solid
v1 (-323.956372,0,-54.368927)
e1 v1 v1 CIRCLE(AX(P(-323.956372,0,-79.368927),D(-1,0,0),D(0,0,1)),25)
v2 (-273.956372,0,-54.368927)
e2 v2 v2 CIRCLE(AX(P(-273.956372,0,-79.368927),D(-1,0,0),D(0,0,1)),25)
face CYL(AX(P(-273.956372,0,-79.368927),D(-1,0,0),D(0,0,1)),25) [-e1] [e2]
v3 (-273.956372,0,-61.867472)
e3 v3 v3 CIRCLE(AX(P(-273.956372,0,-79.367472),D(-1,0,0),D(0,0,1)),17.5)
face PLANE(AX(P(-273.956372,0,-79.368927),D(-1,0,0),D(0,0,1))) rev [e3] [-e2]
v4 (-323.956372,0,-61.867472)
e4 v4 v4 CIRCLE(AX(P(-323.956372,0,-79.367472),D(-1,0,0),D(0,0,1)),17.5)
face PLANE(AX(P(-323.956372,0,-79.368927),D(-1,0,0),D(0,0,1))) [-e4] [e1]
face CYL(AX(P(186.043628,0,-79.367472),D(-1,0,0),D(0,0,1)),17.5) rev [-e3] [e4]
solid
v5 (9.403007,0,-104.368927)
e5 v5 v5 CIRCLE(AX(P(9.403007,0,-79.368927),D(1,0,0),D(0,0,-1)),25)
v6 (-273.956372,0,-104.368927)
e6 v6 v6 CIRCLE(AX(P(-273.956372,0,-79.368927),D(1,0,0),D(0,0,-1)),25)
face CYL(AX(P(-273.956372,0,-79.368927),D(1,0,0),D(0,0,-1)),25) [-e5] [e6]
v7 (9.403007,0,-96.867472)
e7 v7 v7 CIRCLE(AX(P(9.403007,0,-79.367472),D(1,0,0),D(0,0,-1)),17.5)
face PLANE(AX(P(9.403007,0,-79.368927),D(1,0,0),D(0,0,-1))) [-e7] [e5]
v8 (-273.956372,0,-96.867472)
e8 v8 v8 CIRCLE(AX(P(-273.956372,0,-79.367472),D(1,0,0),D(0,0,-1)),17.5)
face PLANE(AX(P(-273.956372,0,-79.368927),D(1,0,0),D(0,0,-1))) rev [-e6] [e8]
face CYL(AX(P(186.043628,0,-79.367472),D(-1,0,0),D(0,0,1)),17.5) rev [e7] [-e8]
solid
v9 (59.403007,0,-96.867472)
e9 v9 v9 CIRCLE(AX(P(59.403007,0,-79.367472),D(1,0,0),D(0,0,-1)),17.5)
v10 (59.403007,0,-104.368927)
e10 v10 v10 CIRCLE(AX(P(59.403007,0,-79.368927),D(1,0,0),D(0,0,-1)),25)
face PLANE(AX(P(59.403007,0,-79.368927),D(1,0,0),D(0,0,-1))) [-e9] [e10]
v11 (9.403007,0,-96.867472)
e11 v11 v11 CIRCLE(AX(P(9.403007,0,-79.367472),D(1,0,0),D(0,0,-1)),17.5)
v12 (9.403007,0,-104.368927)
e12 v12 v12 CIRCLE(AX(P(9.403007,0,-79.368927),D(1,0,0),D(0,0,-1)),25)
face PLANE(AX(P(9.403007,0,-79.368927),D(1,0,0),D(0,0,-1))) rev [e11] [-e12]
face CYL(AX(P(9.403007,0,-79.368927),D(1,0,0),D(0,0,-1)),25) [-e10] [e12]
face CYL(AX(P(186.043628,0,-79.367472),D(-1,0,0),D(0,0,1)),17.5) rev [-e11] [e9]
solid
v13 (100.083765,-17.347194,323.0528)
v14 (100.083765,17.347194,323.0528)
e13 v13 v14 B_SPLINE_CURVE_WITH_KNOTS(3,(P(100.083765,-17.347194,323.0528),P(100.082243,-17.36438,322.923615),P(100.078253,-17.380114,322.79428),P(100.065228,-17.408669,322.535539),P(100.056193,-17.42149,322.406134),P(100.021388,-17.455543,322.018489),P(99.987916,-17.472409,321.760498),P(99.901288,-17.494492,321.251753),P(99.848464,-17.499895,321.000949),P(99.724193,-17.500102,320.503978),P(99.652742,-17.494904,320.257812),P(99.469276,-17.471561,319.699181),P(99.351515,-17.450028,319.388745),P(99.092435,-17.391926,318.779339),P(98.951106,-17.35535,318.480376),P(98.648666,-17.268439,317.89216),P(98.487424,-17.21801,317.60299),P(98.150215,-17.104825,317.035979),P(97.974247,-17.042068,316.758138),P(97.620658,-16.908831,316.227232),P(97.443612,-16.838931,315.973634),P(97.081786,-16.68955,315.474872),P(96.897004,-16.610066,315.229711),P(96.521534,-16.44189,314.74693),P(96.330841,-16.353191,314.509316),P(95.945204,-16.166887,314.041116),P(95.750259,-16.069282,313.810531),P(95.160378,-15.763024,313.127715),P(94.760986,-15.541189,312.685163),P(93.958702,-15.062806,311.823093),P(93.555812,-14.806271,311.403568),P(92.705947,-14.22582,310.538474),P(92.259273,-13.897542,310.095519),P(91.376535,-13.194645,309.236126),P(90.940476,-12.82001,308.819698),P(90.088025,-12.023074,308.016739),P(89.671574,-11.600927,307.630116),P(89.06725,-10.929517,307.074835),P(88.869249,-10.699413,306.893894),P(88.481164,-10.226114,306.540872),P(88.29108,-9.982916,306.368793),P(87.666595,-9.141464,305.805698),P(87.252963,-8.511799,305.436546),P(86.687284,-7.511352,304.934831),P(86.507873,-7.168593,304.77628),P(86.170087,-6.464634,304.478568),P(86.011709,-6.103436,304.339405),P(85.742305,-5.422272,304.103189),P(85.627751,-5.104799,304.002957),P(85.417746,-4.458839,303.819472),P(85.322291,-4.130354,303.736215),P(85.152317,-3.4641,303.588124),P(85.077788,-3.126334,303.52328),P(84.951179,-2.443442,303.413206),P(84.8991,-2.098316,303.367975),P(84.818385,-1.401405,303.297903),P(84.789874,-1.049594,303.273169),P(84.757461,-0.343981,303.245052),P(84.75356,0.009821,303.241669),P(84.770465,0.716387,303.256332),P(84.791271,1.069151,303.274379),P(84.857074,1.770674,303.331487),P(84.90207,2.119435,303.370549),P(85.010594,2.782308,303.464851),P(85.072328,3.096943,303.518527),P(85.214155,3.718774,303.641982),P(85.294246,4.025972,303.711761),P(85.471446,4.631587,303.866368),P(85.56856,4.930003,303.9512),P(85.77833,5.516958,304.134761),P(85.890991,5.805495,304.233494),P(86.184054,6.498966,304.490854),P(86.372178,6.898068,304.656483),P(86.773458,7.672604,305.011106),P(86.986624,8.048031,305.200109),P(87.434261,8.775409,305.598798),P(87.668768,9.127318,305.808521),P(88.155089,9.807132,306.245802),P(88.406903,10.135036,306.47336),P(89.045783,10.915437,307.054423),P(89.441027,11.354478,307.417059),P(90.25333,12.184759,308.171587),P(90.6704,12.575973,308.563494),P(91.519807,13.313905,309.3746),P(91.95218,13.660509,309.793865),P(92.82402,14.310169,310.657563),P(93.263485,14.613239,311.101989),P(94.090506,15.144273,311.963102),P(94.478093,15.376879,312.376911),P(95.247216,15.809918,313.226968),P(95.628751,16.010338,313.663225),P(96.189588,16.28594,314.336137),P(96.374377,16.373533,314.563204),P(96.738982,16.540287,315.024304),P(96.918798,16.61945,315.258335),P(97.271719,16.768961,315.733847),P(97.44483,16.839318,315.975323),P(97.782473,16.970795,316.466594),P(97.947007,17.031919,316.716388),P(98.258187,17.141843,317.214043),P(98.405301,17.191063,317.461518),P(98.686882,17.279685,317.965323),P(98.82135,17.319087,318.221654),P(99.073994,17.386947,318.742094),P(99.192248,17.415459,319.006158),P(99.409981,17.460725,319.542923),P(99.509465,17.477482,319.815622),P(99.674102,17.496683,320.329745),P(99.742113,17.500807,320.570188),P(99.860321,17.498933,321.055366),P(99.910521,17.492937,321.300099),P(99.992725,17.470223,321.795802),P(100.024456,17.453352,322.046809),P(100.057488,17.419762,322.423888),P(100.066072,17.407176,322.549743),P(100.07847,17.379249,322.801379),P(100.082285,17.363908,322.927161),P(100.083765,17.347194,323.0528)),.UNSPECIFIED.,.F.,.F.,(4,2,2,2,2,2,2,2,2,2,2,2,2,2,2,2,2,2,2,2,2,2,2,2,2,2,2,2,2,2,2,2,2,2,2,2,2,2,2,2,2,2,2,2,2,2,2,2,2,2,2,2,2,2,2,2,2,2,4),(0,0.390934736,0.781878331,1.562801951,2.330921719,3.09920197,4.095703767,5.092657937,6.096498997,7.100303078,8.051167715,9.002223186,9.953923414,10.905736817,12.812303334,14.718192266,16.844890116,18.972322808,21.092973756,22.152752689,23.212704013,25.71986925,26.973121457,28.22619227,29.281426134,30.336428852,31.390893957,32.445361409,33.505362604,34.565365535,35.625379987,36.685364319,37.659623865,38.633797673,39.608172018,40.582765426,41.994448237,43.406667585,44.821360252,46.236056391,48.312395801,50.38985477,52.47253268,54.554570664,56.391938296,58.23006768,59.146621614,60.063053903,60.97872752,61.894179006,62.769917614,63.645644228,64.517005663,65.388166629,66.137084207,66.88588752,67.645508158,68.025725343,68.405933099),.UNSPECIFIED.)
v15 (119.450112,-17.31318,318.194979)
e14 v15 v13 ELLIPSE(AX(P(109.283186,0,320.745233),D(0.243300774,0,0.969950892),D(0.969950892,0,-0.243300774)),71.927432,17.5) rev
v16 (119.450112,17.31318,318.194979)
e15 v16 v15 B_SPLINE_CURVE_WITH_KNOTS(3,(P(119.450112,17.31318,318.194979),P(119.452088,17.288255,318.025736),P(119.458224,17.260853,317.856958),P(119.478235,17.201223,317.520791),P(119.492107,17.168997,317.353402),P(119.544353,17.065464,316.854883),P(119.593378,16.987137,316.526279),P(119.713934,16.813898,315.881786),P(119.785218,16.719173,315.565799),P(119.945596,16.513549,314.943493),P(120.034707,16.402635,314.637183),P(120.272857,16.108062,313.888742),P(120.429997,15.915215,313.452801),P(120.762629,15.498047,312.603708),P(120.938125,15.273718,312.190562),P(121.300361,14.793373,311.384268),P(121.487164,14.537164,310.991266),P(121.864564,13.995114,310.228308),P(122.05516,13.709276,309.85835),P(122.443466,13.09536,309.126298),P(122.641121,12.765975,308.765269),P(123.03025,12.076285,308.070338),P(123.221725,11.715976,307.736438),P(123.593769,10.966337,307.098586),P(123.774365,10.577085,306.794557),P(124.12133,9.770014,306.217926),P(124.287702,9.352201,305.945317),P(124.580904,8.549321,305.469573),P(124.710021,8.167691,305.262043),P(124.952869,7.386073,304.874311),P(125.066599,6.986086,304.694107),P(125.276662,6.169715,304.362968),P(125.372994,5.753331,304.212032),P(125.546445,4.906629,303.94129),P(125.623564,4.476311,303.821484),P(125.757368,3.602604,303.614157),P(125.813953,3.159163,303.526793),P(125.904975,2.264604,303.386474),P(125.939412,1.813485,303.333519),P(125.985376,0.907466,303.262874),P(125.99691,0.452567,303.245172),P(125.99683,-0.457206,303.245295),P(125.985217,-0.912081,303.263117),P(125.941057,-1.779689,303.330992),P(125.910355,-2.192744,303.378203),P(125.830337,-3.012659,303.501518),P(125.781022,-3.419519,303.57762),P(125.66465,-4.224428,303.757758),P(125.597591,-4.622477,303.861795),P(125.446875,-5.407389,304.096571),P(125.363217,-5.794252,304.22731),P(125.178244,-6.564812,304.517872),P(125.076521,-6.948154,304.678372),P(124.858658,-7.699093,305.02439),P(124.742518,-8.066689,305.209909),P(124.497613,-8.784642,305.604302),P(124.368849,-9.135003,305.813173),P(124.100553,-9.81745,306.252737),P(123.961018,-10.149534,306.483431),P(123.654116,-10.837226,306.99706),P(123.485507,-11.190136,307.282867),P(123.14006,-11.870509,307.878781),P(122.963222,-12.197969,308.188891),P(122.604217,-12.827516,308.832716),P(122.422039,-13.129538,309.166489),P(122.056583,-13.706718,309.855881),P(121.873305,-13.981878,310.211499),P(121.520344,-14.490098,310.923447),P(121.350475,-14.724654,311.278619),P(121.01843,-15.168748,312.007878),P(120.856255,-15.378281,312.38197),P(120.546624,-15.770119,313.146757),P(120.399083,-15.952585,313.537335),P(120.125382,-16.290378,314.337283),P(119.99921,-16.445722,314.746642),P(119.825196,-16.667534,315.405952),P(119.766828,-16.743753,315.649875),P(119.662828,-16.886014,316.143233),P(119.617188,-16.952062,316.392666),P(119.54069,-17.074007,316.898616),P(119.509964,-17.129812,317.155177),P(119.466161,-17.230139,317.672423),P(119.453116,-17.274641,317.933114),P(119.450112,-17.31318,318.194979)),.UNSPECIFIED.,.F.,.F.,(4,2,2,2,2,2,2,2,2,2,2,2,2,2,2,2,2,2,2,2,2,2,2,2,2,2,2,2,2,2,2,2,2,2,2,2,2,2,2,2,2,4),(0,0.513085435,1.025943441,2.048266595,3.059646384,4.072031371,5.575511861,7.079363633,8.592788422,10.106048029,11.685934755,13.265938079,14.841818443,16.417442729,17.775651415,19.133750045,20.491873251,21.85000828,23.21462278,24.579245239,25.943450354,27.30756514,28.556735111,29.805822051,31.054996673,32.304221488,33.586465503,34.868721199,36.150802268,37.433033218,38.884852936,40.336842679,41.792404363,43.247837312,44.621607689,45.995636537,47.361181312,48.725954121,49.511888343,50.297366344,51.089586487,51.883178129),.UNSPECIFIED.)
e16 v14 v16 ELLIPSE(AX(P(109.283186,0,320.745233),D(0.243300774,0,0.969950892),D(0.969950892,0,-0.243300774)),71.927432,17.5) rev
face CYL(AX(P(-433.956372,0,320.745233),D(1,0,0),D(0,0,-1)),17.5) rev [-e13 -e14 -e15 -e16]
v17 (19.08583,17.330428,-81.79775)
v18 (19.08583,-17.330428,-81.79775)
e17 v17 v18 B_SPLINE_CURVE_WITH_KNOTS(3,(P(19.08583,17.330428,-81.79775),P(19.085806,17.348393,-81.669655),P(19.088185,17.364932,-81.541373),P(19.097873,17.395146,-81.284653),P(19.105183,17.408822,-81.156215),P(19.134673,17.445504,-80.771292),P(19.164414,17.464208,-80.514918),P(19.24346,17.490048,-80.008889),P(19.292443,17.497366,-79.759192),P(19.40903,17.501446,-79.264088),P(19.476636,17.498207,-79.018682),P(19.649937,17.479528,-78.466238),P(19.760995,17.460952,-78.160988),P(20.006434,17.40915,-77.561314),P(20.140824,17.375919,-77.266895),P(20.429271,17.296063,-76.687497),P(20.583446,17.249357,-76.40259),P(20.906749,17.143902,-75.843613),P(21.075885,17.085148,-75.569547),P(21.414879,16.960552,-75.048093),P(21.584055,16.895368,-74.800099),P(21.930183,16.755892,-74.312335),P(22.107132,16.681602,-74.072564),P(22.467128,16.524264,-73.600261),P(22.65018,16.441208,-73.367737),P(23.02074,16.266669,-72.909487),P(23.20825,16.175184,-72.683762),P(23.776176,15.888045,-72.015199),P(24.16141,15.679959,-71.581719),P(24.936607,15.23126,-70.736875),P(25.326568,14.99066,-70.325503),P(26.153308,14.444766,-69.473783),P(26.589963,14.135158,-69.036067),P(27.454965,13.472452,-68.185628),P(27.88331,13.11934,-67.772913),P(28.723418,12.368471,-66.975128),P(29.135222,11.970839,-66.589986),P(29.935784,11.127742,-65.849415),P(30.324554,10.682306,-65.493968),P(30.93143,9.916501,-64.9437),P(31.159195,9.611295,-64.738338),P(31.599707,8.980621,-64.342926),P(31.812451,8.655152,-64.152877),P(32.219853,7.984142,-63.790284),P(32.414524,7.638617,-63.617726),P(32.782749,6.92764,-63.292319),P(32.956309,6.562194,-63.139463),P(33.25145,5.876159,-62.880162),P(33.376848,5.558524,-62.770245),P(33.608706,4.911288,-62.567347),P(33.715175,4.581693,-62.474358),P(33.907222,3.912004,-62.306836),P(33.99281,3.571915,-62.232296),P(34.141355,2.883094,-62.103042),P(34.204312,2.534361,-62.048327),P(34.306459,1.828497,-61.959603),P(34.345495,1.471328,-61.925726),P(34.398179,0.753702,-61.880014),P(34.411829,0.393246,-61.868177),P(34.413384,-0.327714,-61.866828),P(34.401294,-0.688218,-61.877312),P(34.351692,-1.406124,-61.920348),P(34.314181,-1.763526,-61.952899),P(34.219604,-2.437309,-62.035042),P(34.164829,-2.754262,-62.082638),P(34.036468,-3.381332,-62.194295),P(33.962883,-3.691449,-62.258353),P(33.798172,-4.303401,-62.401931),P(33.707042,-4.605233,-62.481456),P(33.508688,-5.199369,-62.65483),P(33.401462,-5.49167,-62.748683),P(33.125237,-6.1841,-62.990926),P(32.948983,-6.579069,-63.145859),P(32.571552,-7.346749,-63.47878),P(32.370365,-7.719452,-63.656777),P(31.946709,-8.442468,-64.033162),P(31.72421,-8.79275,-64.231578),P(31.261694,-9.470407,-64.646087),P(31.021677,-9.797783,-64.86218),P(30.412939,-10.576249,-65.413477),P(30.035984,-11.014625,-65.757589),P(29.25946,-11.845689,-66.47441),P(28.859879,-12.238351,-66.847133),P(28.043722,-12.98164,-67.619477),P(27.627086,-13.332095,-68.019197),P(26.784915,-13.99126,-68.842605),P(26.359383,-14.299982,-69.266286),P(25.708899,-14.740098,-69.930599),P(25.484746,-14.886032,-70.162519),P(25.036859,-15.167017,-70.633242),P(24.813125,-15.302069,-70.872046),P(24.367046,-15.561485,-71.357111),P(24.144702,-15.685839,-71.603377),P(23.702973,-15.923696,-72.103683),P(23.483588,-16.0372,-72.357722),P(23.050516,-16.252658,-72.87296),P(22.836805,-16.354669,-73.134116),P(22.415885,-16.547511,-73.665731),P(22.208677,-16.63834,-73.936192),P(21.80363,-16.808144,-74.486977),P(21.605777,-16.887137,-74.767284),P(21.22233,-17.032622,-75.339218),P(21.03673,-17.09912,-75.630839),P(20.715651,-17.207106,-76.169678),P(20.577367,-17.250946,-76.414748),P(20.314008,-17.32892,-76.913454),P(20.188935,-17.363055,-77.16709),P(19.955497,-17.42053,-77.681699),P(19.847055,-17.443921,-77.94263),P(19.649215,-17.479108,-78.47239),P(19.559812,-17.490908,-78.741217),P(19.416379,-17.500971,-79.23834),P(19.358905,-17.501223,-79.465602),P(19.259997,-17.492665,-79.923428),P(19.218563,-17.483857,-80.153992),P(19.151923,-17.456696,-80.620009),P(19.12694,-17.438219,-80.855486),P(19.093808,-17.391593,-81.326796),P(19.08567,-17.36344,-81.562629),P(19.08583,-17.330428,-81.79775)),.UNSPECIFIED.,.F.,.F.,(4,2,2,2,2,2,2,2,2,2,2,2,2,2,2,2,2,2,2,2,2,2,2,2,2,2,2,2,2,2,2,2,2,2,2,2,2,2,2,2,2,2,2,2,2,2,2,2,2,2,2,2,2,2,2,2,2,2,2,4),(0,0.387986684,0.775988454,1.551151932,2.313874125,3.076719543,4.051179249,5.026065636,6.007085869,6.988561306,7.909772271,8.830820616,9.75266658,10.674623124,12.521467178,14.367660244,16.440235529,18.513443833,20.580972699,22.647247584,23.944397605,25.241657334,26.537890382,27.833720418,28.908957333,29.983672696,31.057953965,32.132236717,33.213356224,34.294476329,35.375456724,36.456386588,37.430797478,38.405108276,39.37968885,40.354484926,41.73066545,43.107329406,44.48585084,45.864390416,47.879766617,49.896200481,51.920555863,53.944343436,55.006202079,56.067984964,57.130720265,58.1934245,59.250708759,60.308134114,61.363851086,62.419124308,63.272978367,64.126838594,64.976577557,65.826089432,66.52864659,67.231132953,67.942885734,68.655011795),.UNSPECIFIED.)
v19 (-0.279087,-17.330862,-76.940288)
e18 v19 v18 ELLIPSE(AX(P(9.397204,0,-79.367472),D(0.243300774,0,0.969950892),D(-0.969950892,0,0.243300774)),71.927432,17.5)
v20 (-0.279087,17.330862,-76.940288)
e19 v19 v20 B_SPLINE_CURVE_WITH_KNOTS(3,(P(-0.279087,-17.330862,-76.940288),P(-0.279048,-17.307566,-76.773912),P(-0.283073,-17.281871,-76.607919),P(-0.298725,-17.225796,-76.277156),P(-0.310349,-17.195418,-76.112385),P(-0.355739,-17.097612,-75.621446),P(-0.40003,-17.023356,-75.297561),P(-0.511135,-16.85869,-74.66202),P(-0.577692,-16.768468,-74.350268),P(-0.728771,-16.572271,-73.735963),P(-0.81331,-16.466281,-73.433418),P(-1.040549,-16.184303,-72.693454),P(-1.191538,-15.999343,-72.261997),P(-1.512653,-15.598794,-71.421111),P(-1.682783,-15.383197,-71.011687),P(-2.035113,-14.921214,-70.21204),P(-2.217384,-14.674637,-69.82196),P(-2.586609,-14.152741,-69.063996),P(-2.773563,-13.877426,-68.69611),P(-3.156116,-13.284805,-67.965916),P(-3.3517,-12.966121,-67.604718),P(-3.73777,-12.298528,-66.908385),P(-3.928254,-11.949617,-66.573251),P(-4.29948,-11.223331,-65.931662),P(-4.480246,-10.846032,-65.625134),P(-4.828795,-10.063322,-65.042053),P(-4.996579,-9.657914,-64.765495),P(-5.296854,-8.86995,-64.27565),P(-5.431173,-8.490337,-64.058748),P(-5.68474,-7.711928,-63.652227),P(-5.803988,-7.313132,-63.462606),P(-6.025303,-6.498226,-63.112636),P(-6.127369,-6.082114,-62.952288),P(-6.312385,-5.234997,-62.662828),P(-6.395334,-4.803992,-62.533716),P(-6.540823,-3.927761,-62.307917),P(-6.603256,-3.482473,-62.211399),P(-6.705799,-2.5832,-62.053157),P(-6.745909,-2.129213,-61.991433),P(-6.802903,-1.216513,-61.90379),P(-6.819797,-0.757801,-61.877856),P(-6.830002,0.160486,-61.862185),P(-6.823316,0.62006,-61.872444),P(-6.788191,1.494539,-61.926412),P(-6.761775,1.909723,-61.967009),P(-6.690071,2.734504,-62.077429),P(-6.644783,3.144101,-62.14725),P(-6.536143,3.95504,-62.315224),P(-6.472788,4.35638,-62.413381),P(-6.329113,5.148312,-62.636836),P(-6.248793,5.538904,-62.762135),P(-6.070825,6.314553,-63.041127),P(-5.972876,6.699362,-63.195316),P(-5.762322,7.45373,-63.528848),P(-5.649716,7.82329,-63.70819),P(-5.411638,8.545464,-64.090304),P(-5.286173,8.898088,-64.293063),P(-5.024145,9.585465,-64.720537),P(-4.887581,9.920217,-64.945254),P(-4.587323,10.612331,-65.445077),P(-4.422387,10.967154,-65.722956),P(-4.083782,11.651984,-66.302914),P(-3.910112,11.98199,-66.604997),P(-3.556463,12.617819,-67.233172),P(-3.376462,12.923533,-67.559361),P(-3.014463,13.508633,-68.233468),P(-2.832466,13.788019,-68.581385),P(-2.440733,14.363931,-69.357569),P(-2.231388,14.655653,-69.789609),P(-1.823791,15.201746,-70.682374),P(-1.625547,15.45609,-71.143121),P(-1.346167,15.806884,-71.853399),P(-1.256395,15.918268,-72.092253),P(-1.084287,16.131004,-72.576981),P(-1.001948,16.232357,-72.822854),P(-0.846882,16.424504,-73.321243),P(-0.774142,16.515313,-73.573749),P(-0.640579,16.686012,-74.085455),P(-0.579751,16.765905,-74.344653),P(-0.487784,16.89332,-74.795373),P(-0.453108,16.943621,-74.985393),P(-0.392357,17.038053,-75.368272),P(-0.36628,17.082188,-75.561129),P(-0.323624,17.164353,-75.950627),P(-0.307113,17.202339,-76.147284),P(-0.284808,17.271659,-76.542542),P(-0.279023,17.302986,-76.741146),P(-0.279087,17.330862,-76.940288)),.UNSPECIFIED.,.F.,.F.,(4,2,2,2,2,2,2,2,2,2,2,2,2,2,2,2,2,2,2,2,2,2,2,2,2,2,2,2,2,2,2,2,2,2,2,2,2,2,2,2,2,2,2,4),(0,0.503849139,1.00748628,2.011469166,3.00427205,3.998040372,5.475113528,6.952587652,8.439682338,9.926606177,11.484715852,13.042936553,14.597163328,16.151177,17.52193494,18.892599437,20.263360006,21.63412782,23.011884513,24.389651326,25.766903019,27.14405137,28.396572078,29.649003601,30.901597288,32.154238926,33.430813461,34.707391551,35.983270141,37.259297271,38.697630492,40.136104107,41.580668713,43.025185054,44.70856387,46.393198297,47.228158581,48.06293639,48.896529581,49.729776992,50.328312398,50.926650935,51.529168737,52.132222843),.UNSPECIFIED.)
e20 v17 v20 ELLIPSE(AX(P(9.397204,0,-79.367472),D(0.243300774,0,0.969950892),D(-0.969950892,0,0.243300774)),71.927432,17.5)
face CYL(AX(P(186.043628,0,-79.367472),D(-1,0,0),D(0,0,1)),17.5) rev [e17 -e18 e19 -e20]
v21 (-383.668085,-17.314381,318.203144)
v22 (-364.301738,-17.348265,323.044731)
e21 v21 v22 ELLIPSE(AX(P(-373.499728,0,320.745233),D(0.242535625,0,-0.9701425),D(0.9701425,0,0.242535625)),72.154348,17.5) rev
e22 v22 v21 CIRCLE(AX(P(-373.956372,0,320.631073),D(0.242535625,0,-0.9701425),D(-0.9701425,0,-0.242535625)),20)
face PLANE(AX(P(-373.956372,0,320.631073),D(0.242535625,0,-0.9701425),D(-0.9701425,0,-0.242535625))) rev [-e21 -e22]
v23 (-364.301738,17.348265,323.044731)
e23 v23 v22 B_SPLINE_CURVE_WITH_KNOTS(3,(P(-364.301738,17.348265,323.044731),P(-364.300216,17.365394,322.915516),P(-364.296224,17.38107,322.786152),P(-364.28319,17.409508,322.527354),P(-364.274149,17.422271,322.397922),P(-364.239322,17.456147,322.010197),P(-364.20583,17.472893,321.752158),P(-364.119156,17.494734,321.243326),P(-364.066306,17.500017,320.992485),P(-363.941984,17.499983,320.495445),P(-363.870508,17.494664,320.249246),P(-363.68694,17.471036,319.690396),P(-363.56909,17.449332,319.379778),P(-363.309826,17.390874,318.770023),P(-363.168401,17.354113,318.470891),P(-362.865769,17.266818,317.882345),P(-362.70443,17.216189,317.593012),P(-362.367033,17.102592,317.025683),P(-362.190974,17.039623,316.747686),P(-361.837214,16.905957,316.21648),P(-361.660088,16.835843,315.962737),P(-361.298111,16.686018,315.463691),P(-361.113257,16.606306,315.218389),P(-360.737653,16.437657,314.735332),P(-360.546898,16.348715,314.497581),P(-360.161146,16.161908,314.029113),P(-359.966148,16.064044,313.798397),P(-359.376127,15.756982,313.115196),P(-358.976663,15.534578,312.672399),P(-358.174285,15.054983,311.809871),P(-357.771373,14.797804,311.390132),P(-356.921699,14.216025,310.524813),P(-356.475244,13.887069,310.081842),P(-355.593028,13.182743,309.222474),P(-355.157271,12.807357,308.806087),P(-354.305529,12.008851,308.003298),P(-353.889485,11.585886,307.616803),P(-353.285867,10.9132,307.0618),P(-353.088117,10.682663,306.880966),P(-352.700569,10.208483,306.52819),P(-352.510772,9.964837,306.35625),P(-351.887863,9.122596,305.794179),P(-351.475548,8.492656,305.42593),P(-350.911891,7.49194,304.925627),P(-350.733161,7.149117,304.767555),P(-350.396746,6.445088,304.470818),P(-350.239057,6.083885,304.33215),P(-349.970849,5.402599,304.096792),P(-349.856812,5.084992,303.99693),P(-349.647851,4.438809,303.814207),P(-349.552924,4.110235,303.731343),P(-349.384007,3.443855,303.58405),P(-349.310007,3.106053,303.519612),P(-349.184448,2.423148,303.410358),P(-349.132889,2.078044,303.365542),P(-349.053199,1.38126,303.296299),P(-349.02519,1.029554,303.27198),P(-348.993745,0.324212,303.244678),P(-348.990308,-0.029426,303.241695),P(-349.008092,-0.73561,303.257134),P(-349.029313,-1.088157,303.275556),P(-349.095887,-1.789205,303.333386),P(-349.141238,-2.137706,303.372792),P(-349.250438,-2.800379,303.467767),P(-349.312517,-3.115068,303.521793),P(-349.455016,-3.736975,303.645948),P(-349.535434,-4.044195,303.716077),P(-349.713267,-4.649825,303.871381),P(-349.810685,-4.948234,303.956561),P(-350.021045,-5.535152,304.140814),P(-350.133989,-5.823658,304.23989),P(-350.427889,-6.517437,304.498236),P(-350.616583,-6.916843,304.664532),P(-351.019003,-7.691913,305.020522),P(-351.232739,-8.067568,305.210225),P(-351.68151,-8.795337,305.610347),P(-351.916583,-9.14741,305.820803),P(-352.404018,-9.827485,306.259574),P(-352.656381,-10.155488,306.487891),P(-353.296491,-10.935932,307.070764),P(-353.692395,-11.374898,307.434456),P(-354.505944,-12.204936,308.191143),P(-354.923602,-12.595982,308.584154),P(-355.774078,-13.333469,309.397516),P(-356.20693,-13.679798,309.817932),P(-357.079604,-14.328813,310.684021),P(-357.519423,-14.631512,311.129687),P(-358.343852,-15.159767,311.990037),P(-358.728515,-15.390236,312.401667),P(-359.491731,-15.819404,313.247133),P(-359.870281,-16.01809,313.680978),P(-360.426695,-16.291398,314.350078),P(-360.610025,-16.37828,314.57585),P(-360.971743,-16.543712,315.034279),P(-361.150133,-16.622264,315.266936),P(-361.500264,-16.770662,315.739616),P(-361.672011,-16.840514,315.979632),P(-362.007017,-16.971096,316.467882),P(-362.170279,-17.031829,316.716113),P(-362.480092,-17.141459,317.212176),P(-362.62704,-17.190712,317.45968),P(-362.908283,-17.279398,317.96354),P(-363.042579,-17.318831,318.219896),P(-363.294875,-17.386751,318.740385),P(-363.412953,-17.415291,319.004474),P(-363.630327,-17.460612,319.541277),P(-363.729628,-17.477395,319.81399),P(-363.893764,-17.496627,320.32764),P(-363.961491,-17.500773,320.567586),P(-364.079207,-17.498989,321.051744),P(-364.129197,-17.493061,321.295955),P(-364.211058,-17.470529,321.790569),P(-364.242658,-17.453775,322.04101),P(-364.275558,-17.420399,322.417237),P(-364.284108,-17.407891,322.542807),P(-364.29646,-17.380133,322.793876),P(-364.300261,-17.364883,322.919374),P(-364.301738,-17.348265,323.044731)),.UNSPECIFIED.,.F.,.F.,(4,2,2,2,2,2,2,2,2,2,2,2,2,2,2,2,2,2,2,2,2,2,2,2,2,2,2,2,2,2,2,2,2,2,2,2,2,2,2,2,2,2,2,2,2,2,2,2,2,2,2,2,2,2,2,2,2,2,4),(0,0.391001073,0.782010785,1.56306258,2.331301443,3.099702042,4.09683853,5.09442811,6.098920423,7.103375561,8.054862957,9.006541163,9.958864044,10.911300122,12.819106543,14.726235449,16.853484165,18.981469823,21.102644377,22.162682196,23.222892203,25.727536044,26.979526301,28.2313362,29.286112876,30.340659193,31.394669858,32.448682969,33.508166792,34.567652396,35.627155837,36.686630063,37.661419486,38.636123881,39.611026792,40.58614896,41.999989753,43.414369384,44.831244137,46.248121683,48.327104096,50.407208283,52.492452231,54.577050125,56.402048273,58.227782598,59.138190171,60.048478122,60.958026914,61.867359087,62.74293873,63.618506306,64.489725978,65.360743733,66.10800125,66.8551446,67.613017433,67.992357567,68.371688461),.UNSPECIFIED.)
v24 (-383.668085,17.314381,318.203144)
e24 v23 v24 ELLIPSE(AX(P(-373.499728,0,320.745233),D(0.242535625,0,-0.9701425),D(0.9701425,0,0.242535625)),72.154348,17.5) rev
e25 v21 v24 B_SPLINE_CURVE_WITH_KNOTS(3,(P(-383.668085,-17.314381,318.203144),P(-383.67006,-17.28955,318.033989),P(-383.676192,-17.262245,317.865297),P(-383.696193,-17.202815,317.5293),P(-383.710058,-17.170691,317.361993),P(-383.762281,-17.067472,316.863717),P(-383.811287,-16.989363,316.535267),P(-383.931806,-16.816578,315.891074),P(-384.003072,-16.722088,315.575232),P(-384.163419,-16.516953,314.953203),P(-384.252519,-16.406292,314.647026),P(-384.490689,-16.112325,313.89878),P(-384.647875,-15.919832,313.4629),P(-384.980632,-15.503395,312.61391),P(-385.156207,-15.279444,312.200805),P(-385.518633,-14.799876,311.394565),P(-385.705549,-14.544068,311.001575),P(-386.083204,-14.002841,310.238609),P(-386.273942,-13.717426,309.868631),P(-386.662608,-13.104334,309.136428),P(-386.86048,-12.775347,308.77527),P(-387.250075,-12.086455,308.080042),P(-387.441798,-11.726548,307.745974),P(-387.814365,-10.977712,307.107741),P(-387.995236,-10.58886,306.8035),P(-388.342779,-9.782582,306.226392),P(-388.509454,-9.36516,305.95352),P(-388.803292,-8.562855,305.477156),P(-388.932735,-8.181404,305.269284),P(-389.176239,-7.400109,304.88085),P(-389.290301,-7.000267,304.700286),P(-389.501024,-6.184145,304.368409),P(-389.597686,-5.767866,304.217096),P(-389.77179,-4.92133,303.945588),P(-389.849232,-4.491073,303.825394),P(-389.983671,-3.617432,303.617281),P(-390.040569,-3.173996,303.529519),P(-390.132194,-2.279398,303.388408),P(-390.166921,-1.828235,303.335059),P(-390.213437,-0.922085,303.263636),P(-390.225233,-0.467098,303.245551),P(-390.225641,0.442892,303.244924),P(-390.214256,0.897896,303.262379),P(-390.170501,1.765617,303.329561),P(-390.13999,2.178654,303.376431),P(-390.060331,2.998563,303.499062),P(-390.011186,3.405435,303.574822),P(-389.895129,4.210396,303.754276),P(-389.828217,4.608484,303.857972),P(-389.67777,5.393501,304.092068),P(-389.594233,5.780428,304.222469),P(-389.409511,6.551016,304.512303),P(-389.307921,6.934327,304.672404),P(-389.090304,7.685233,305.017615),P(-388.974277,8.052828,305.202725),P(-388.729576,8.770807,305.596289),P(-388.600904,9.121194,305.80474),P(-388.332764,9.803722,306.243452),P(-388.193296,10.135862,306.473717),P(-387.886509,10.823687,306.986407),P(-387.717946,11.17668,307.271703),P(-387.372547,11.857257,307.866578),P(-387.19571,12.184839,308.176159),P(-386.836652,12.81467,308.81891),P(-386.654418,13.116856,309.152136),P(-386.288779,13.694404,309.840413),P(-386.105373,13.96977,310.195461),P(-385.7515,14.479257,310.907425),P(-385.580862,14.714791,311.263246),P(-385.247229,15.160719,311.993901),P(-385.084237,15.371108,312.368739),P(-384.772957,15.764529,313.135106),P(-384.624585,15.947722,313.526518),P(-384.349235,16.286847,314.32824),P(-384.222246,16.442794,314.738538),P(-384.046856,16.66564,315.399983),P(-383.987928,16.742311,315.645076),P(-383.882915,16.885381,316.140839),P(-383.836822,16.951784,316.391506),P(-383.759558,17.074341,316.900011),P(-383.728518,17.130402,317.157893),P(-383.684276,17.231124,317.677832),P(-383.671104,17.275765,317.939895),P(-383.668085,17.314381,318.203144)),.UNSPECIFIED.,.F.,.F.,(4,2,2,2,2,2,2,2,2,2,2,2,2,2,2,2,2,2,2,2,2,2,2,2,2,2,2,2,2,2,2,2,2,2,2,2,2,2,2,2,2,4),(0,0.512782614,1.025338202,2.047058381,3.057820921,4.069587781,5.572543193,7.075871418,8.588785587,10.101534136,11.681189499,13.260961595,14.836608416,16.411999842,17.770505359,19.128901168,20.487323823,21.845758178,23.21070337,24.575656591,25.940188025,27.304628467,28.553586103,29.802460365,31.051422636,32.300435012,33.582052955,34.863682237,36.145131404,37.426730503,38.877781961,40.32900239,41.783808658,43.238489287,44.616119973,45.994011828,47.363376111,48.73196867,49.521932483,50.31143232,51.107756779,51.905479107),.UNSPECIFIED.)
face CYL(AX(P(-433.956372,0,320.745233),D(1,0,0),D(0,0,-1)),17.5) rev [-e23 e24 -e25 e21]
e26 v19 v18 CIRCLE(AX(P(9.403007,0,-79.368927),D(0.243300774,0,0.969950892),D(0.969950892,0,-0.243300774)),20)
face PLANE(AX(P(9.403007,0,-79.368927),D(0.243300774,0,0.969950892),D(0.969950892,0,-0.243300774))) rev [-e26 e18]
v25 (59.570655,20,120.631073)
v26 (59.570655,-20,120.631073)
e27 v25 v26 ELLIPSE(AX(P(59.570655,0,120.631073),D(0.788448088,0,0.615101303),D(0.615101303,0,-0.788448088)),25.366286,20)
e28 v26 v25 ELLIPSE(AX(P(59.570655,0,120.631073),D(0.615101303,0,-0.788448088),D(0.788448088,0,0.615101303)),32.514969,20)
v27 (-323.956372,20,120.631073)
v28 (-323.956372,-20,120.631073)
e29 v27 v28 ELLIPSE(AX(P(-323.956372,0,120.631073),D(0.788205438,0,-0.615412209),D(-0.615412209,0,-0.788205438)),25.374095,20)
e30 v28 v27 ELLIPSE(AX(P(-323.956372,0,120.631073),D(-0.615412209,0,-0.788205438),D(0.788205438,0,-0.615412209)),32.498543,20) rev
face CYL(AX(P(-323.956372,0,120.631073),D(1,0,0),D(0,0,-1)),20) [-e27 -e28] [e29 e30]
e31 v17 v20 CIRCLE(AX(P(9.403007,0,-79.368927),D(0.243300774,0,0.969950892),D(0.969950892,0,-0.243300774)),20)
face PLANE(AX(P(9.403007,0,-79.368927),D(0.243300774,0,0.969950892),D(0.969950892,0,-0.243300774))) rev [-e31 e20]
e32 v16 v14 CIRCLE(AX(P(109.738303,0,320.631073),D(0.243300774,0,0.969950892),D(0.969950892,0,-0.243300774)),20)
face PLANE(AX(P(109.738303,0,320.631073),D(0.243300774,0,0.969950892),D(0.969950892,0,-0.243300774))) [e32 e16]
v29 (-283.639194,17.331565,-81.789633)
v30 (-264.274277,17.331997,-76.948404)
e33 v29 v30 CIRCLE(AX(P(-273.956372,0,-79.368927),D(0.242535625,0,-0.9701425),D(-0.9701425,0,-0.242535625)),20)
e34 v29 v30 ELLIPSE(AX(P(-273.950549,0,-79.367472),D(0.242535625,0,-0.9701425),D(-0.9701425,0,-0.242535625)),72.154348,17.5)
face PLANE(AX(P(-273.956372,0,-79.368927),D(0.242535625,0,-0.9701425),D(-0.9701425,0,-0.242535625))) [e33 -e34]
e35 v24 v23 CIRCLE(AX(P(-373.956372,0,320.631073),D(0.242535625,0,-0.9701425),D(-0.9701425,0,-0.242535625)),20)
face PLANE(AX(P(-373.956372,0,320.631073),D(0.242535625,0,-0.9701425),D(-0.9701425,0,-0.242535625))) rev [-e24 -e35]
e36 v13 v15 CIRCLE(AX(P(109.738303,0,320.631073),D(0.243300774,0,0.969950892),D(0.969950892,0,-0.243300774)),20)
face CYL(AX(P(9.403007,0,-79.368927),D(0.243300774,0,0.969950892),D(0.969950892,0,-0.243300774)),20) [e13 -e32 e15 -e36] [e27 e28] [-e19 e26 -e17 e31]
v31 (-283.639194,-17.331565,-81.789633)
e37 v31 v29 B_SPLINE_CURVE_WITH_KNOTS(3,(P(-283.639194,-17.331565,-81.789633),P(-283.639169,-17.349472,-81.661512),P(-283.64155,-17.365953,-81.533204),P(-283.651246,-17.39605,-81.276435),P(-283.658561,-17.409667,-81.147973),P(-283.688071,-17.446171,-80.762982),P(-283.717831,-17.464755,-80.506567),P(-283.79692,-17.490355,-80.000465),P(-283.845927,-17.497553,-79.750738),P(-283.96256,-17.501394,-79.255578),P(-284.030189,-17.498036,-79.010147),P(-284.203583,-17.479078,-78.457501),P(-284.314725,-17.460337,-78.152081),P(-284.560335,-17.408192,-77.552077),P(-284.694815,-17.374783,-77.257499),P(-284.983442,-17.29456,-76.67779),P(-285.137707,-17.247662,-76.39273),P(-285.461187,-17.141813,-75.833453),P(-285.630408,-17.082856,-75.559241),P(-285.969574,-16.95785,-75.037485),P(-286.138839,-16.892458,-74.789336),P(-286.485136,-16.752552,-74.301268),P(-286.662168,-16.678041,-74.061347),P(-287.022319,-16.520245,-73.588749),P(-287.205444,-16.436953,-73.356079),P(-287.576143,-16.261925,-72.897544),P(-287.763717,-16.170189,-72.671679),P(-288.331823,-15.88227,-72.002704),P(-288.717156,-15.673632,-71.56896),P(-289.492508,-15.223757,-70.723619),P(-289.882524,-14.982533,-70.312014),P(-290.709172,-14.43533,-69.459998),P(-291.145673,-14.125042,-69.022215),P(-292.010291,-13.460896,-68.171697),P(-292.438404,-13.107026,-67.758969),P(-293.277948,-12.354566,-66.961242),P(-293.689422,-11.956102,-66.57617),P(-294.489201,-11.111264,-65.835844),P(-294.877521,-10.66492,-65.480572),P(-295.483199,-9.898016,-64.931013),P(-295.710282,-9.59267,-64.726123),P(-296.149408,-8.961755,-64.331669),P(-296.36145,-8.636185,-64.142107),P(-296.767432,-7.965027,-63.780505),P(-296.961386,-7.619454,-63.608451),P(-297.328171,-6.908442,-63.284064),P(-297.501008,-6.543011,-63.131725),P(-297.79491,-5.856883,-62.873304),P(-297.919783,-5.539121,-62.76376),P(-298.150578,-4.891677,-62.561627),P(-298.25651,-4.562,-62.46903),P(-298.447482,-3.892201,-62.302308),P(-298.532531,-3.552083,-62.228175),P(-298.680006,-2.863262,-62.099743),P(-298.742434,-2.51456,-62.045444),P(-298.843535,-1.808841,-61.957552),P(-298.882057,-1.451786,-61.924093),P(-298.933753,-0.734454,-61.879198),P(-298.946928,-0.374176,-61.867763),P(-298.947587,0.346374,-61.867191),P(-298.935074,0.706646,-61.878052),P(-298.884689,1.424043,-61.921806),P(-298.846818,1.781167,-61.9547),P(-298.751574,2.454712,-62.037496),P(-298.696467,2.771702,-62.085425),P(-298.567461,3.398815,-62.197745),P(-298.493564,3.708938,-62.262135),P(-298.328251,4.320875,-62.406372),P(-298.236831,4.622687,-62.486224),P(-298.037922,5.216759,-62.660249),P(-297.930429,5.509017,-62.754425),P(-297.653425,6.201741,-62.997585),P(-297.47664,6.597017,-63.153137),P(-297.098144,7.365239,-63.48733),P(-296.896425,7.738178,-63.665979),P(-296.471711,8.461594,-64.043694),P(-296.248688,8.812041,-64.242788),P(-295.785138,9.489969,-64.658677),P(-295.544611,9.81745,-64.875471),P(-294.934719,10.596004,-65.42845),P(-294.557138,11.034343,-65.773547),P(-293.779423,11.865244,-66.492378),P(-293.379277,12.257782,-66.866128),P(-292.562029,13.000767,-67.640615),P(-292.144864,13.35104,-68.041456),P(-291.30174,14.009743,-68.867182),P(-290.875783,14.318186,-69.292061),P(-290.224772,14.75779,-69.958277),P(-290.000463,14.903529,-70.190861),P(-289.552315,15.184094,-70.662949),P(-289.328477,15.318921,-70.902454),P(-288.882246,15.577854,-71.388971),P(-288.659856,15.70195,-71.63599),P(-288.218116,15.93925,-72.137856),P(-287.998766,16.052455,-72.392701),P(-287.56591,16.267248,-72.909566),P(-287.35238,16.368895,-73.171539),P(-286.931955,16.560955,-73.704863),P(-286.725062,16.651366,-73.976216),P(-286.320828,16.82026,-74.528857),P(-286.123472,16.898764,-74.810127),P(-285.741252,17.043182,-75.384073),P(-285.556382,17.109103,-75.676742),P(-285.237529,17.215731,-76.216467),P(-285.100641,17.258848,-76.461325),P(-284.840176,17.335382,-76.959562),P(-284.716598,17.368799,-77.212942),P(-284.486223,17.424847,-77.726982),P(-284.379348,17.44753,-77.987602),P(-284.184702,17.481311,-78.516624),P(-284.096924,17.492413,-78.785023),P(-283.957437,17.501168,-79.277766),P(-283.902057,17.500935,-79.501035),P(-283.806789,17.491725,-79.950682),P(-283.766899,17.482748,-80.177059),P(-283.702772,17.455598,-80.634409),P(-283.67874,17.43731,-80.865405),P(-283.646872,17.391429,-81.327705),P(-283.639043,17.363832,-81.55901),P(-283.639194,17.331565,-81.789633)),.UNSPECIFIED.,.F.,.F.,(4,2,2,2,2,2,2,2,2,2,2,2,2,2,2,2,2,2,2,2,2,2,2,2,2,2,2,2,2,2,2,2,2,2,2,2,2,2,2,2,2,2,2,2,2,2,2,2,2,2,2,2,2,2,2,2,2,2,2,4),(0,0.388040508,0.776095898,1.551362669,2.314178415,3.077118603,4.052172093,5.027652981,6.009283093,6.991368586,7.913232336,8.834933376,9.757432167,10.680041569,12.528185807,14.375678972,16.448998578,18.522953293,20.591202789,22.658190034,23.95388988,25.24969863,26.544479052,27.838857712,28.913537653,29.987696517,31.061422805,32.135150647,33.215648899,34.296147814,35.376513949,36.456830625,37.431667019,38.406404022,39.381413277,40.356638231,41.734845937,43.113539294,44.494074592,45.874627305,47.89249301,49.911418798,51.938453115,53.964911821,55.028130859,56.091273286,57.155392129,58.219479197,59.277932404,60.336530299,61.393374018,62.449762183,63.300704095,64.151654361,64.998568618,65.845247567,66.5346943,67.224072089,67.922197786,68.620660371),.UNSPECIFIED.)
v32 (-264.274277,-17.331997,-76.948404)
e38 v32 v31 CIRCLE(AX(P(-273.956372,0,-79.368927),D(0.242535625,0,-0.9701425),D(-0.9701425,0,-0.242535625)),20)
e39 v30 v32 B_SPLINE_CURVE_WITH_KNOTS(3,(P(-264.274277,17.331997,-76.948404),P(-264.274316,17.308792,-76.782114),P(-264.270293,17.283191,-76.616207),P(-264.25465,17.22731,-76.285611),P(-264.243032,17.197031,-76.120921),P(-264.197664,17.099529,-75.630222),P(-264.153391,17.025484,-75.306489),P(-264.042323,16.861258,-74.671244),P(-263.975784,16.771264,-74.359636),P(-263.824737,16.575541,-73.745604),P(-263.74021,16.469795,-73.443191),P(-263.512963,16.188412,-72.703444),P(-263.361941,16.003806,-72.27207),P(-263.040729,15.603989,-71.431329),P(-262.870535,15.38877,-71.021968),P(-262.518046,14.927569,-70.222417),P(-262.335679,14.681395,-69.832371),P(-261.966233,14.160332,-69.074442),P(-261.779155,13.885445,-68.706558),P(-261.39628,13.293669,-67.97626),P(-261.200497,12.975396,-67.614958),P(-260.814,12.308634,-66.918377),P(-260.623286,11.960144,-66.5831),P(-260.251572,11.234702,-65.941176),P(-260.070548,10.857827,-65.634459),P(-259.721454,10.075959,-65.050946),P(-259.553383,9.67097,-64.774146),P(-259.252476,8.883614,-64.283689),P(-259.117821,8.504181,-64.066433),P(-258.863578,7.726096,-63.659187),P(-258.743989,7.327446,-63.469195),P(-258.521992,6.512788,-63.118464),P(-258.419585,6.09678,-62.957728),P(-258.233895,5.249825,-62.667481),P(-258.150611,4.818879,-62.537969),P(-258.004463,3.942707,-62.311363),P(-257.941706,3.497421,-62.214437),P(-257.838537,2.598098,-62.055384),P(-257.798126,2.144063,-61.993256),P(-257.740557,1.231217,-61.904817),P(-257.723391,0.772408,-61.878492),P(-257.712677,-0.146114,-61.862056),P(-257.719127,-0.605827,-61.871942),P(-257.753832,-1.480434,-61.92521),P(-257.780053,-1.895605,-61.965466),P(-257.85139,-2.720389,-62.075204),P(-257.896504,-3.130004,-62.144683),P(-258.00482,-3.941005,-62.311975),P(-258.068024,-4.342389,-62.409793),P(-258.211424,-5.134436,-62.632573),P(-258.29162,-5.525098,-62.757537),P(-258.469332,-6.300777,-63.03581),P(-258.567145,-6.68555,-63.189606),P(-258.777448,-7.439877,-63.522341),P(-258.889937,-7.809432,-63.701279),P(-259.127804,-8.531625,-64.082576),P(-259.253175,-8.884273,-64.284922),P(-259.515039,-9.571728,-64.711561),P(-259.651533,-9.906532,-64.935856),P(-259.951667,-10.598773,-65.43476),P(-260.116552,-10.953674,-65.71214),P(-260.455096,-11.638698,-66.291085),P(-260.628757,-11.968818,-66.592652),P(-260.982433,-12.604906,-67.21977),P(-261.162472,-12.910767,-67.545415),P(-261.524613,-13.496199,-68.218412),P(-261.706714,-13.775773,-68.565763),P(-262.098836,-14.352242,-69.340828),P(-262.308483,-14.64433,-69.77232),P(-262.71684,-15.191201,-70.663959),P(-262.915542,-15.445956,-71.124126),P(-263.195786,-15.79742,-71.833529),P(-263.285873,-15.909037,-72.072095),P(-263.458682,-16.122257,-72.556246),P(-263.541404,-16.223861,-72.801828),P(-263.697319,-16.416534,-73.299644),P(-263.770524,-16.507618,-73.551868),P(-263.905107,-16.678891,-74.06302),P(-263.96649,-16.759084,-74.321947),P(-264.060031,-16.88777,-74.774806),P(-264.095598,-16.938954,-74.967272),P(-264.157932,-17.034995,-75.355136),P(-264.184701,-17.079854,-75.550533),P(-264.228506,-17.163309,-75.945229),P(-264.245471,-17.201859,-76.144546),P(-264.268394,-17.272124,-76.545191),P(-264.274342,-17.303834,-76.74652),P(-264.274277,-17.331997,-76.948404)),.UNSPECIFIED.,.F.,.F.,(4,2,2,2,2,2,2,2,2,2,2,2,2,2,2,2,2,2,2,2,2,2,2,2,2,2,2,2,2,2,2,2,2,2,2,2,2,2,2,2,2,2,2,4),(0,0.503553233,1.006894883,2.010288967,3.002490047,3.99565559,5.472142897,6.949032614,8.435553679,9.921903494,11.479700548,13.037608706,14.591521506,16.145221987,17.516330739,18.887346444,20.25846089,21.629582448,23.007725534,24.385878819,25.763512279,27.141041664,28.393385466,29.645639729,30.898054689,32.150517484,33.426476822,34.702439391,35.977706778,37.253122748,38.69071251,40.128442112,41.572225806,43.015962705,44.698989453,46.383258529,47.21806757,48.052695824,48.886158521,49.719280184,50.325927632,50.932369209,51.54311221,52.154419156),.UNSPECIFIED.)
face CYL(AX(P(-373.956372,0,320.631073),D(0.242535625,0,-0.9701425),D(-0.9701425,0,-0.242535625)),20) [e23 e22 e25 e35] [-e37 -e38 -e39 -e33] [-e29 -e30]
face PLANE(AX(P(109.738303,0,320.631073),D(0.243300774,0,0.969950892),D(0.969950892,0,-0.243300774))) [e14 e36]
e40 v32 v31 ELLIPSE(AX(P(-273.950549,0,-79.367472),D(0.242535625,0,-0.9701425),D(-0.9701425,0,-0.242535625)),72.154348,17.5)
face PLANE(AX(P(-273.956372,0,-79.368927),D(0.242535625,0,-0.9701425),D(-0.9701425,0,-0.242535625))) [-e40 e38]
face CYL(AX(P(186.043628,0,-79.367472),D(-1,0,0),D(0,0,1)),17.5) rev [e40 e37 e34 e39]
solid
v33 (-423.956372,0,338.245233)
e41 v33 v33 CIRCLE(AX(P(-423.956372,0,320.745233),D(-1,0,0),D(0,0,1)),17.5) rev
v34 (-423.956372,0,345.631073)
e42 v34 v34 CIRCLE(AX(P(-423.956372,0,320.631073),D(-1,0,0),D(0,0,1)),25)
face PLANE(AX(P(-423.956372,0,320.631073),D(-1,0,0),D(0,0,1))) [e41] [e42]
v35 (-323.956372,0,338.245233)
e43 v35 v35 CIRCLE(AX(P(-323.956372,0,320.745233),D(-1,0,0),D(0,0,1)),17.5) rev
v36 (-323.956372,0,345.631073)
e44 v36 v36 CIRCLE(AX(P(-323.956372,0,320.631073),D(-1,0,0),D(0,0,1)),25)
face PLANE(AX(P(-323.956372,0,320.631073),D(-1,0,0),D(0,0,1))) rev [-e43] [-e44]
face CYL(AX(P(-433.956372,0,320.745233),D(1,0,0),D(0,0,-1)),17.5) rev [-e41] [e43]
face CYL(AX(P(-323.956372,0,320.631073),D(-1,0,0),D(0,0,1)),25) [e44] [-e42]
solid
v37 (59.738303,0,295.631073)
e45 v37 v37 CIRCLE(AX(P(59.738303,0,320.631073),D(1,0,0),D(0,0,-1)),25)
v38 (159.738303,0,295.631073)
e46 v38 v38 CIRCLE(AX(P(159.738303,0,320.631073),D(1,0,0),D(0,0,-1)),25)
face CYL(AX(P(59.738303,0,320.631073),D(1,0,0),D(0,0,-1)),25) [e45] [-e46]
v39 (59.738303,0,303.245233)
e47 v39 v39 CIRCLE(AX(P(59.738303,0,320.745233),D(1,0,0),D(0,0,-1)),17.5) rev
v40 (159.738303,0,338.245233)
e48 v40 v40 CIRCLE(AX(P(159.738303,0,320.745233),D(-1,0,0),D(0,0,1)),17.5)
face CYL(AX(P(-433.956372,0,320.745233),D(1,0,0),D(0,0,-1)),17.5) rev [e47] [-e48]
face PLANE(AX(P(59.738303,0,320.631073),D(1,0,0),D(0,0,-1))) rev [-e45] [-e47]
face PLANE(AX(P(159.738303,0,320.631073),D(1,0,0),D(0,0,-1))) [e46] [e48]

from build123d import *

# Parameters (mm, degrees)
SWEEP1_PROFILE_R        = 20
SWEEP2_START            = -74.696203031
SWEEP2_OUTLINE_R        = 20
SWEEP2_DEPTH            = 412.392012033
SWEEP3_PROFILE_R        = 20
SWEEP4_PROFILE_R        = 25
SWEEP5_PROFILE_R        = 25
SWEEP6_START            = -273.956371512
SWEEP6_OUTLINE_R        = 25
SWEEP6_DEPTH            = 283.359378358
SWEEP7_PROFILE_R        = 25
SWEEP8_PROFILE_R        = 25
CUT_EXTRUDE1_DEPTH      = 10
CUT_EXTRUDE1_DEPTH_BACK = 583.694674
SKETCH110_R             = 17.5
SKETCH127_R             = 17.5
CUT_EXTRUDE2_DEPTH      = 510


# Read off the part's stored shape, not the designer's step: Sweep2, Sweep6
with BuildPart() as part:
    # Sweep1: sweep along a path in Lower wishbone
    with BuildLine(Plane(origin=(0, 0, 0), x_dir=(1, 0, 0), z_dir=(0, 1, 0))) as sweep1_path:
        Line((-373.956371512, -320.631072668), (-273.956371512, 79.368927332))
    # Sweep1 profile (on start of the path) → Sweep1 (sweep)
    with BuildSketch(Plane(origin=(-373.956371512, 0, 320.631072668), x_dir=(-0.9701425001453319, 0, -0.2425356250363329), z_dir=(0.2425356250363329, 0, -0.9701425001453319))):
        Circle(SWEEP1_PROFILE_R)
    sweep(path=sweep1_path.line)



with BuildPart() as body_2:
    # Sweep2 outline → Sweep2 (new body)
    with BuildSketch(Plane(origin=(0, 0, 0), x_dir=(0.9699508921808406, 0, -0.24330077426426597), z_dir=(0.24330077426426594, 0, 0.9699508921808407)).offset(SWEEP2_START)):
        with Locations((28.430976352, 0)):
            Circle(SWEEP2_OUTLINE_R)
    extrude(amount=SWEEP2_DEPTH)


with BuildPart() as part_1:
    add(part.part)

    add(body_2.part)  # Sweep3 merges body 2
    # Sweep3: sweep along a path in Lower wishbone<7>
    with BuildLine(Plane(origin=(0, 0, 0), x_dir=(1, 0, 0), z_dir=(0, 1, 0))) as sweep3_path:
        Line((-323.956371512, -120.631072668), (59.57065476, -120.631072668))
    # Sweep3 profile (on start of the path) → Sweep3 (sweep)
    with BuildSketch(Plane(origin=(-323.956371512, 0, 120.631072668), x_dir=(0, 0, 1), z_dir=(1, 0, 0))):
        Circle(SWEEP3_PROFILE_R)
    sweep(path=sweep3_path.line)


with BuildPart() as body_2_2:
    # Sweep4: sweep along a path in Lower wishbone<8>
    with BuildLine(Plane(origin=(0, 0, 0), x_dir=(1, 0, 0), z_dir=(0, 1, 0))) as sweep4_path:
        Line((59.738302674, -320.631072668), (159.738302674, -320.631072668))
    # Sweep4 profile (on start of the path) → Sweep4 (sweep)
    with BuildSketch(Plane(origin=(59.738302674, 0, 320.631072668), x_dir=(0, 0, 1), z_dir=(1, 0, 0))):
        Circle(SWEEP4_PROFILE_R)
    sweep(path=sweep4_path.line)


with BuildPart() as body_3:
    # Sweep5: sweep along a path in Lower wishbone<9>
    with BuildLine(Plane(origin=(0, 0, 0), x_dir=(1, 0, 0), z_dir=(0, 1, 0))) as sweep5_path:
        Line((-323.956371512, -320.631072668), (-423.956371512, -320.631072668))
    # Sweep5 profile (on start of the path) → Sweep5 (sweep)
    with BuildSketch(Plane(origin=(-323.956371512, 0, 320.631072668), x_dir=(0, 0, -1), z_dir=(-1, 0, 0))):
        Circle(SWEEP5_PROFILE_R)
    sweep(path=sweep5_path.line)


with BuildPart() as body_4:
    # Sweep6 outline → Sweep6 (new body)
    with BuildSketch(Plane.YZ.offset(SWEEP6_START)):
        with Locations((0, -79.368927332)):
            Circle(SWEEP6_OUTLINE_R)
    extrude(amount=SWEEP6_DEPTH)


with BuildPart() as body_5:
    # Sweep7: sweep along a path in Lower wishbone<11>
    with BuildLine(Plane(origin=(0, 0, 0), x_dir=(1, 0, 0), z_dir=(0, 1, 0))) as sweep7_path:
        Line((-273.956371512, 79.368927332), (-323.956371512, 79.368927332))
    # Sweep7 profile (on start of the path) → Sweep7 (sweep)
    with BuildSketch(Plane(origin=(-273.956371512, 0, -79.368927332), x_dir=(0, 0, -1), z_dir=(-1, 0, 0))):
        Circle(SWEEP7_PROFILE_R)
    sweep(path=sweep7_path.line)


with BuildPart() as body_6:
    # Sweep8: sweep along a path in Lower wishbone<12>
    with BuildLine(Plane(origin=(0, 0, 0), x_dir=(1, 0, 0), z_dir=(0, 1, 0))) as sweep8_path:
        Line((9.403006846, 79.368927332), (59.403006846, 79.368927332))
    # Sweep8 profile (on start of the path) → Sweep8 (sweep)
    with BuildSketch(Plane(origin=(9.403006846, 0, -79.368927332), x_dir=(0, 0, 1), z_dir=(1, 0, 0))):
        Circle(SWEEP8_PROFILE_R)
    sweep(path=sweep8_path.line)


with BuildPart() as cut_extrude1_tool:
    # Sketch110 → Cut-Extrude1 (new, two sides: drawn at the far end of the back side and taken through both)
    with BuildSketch(Plane.ZY.offset(423.956371512).offset(-CUT_EXTRUDE1_DEPTH_BACK)):
        with Locations((320.745233447, 0)):
            Circle(SKETCH110_R)
    extrude(amount=CUT_EXTRUDE1_DEPTH + CUT_EXTRUDE1_DEPTH_BACK)


with BuildPart() as part_2:
    add(part_1.part)

    # Cut-Extrude1: cut by cut_extrude1_tool
    add(cut_extrude1_tool.part, mode=Mode.SUBTRACT)


with BuildPart() as body_2_2_1:
    add(body_2_2.part)

    # Cut-Extrude1: cut by cut_extrude1_tool
    add(cut_extrude1_tool.part, mode=Mode.SUBTRACT)


with BuildPart() as body_3_1:
    add(body_3.part)

    # Cut-Extrude1: cut by cut_extrude1_tool
    add(cut_extrude1_tool.part, mode=Mode.SUBTRACT)


with BuildPart() as cut_extrude2_tool:
    # Sketch127 → Cut-Extrude2 (new body)
    with BuildSketch(Plane.ZY.offset(323.956371512)):
        with Locations(Location((-79.367471676, 0, 0), (0, 0, 180))):
            Circle(SKETCH127_R)
    extrude(amount=-CUT_EXTRUDE2_DEPTH)


with BuildPart() as part_3:
    add(part_2.part)

    # Cut-Extrude2: cut by cut_extrude2_tool
    add(cut_extrude2_tool.part, mode=Mode.SUBTRACT)


with BuildPart() as body_4_1:
    add(body_4.part)

    # Cut-Extrude2: cut by cut_extrude2_tool
    add(cut_extrude2_tool.part, mode=Mode.SUBTRACT)


with BuildPart() as body_5_1:
    add(body_5.part)

    # Cut-Extrude2: cut by cut_extrude2_tool
    add(cut_extrude2_tool.part, mode=Mode.SUBTRACT)


with BuildPart() as body_6_1:
    add(body_6.part)

    # Cut-Extrude2: cut by cut_extrude2_tool
    add(cut_extrude2_tool.part, mode=Mode.SUBTRACT)


solid = Compound([body_2_2_1.part, body_3_1.part, part_3.part, body_4_1.part, body_5_1.part, body_6_1.part])
